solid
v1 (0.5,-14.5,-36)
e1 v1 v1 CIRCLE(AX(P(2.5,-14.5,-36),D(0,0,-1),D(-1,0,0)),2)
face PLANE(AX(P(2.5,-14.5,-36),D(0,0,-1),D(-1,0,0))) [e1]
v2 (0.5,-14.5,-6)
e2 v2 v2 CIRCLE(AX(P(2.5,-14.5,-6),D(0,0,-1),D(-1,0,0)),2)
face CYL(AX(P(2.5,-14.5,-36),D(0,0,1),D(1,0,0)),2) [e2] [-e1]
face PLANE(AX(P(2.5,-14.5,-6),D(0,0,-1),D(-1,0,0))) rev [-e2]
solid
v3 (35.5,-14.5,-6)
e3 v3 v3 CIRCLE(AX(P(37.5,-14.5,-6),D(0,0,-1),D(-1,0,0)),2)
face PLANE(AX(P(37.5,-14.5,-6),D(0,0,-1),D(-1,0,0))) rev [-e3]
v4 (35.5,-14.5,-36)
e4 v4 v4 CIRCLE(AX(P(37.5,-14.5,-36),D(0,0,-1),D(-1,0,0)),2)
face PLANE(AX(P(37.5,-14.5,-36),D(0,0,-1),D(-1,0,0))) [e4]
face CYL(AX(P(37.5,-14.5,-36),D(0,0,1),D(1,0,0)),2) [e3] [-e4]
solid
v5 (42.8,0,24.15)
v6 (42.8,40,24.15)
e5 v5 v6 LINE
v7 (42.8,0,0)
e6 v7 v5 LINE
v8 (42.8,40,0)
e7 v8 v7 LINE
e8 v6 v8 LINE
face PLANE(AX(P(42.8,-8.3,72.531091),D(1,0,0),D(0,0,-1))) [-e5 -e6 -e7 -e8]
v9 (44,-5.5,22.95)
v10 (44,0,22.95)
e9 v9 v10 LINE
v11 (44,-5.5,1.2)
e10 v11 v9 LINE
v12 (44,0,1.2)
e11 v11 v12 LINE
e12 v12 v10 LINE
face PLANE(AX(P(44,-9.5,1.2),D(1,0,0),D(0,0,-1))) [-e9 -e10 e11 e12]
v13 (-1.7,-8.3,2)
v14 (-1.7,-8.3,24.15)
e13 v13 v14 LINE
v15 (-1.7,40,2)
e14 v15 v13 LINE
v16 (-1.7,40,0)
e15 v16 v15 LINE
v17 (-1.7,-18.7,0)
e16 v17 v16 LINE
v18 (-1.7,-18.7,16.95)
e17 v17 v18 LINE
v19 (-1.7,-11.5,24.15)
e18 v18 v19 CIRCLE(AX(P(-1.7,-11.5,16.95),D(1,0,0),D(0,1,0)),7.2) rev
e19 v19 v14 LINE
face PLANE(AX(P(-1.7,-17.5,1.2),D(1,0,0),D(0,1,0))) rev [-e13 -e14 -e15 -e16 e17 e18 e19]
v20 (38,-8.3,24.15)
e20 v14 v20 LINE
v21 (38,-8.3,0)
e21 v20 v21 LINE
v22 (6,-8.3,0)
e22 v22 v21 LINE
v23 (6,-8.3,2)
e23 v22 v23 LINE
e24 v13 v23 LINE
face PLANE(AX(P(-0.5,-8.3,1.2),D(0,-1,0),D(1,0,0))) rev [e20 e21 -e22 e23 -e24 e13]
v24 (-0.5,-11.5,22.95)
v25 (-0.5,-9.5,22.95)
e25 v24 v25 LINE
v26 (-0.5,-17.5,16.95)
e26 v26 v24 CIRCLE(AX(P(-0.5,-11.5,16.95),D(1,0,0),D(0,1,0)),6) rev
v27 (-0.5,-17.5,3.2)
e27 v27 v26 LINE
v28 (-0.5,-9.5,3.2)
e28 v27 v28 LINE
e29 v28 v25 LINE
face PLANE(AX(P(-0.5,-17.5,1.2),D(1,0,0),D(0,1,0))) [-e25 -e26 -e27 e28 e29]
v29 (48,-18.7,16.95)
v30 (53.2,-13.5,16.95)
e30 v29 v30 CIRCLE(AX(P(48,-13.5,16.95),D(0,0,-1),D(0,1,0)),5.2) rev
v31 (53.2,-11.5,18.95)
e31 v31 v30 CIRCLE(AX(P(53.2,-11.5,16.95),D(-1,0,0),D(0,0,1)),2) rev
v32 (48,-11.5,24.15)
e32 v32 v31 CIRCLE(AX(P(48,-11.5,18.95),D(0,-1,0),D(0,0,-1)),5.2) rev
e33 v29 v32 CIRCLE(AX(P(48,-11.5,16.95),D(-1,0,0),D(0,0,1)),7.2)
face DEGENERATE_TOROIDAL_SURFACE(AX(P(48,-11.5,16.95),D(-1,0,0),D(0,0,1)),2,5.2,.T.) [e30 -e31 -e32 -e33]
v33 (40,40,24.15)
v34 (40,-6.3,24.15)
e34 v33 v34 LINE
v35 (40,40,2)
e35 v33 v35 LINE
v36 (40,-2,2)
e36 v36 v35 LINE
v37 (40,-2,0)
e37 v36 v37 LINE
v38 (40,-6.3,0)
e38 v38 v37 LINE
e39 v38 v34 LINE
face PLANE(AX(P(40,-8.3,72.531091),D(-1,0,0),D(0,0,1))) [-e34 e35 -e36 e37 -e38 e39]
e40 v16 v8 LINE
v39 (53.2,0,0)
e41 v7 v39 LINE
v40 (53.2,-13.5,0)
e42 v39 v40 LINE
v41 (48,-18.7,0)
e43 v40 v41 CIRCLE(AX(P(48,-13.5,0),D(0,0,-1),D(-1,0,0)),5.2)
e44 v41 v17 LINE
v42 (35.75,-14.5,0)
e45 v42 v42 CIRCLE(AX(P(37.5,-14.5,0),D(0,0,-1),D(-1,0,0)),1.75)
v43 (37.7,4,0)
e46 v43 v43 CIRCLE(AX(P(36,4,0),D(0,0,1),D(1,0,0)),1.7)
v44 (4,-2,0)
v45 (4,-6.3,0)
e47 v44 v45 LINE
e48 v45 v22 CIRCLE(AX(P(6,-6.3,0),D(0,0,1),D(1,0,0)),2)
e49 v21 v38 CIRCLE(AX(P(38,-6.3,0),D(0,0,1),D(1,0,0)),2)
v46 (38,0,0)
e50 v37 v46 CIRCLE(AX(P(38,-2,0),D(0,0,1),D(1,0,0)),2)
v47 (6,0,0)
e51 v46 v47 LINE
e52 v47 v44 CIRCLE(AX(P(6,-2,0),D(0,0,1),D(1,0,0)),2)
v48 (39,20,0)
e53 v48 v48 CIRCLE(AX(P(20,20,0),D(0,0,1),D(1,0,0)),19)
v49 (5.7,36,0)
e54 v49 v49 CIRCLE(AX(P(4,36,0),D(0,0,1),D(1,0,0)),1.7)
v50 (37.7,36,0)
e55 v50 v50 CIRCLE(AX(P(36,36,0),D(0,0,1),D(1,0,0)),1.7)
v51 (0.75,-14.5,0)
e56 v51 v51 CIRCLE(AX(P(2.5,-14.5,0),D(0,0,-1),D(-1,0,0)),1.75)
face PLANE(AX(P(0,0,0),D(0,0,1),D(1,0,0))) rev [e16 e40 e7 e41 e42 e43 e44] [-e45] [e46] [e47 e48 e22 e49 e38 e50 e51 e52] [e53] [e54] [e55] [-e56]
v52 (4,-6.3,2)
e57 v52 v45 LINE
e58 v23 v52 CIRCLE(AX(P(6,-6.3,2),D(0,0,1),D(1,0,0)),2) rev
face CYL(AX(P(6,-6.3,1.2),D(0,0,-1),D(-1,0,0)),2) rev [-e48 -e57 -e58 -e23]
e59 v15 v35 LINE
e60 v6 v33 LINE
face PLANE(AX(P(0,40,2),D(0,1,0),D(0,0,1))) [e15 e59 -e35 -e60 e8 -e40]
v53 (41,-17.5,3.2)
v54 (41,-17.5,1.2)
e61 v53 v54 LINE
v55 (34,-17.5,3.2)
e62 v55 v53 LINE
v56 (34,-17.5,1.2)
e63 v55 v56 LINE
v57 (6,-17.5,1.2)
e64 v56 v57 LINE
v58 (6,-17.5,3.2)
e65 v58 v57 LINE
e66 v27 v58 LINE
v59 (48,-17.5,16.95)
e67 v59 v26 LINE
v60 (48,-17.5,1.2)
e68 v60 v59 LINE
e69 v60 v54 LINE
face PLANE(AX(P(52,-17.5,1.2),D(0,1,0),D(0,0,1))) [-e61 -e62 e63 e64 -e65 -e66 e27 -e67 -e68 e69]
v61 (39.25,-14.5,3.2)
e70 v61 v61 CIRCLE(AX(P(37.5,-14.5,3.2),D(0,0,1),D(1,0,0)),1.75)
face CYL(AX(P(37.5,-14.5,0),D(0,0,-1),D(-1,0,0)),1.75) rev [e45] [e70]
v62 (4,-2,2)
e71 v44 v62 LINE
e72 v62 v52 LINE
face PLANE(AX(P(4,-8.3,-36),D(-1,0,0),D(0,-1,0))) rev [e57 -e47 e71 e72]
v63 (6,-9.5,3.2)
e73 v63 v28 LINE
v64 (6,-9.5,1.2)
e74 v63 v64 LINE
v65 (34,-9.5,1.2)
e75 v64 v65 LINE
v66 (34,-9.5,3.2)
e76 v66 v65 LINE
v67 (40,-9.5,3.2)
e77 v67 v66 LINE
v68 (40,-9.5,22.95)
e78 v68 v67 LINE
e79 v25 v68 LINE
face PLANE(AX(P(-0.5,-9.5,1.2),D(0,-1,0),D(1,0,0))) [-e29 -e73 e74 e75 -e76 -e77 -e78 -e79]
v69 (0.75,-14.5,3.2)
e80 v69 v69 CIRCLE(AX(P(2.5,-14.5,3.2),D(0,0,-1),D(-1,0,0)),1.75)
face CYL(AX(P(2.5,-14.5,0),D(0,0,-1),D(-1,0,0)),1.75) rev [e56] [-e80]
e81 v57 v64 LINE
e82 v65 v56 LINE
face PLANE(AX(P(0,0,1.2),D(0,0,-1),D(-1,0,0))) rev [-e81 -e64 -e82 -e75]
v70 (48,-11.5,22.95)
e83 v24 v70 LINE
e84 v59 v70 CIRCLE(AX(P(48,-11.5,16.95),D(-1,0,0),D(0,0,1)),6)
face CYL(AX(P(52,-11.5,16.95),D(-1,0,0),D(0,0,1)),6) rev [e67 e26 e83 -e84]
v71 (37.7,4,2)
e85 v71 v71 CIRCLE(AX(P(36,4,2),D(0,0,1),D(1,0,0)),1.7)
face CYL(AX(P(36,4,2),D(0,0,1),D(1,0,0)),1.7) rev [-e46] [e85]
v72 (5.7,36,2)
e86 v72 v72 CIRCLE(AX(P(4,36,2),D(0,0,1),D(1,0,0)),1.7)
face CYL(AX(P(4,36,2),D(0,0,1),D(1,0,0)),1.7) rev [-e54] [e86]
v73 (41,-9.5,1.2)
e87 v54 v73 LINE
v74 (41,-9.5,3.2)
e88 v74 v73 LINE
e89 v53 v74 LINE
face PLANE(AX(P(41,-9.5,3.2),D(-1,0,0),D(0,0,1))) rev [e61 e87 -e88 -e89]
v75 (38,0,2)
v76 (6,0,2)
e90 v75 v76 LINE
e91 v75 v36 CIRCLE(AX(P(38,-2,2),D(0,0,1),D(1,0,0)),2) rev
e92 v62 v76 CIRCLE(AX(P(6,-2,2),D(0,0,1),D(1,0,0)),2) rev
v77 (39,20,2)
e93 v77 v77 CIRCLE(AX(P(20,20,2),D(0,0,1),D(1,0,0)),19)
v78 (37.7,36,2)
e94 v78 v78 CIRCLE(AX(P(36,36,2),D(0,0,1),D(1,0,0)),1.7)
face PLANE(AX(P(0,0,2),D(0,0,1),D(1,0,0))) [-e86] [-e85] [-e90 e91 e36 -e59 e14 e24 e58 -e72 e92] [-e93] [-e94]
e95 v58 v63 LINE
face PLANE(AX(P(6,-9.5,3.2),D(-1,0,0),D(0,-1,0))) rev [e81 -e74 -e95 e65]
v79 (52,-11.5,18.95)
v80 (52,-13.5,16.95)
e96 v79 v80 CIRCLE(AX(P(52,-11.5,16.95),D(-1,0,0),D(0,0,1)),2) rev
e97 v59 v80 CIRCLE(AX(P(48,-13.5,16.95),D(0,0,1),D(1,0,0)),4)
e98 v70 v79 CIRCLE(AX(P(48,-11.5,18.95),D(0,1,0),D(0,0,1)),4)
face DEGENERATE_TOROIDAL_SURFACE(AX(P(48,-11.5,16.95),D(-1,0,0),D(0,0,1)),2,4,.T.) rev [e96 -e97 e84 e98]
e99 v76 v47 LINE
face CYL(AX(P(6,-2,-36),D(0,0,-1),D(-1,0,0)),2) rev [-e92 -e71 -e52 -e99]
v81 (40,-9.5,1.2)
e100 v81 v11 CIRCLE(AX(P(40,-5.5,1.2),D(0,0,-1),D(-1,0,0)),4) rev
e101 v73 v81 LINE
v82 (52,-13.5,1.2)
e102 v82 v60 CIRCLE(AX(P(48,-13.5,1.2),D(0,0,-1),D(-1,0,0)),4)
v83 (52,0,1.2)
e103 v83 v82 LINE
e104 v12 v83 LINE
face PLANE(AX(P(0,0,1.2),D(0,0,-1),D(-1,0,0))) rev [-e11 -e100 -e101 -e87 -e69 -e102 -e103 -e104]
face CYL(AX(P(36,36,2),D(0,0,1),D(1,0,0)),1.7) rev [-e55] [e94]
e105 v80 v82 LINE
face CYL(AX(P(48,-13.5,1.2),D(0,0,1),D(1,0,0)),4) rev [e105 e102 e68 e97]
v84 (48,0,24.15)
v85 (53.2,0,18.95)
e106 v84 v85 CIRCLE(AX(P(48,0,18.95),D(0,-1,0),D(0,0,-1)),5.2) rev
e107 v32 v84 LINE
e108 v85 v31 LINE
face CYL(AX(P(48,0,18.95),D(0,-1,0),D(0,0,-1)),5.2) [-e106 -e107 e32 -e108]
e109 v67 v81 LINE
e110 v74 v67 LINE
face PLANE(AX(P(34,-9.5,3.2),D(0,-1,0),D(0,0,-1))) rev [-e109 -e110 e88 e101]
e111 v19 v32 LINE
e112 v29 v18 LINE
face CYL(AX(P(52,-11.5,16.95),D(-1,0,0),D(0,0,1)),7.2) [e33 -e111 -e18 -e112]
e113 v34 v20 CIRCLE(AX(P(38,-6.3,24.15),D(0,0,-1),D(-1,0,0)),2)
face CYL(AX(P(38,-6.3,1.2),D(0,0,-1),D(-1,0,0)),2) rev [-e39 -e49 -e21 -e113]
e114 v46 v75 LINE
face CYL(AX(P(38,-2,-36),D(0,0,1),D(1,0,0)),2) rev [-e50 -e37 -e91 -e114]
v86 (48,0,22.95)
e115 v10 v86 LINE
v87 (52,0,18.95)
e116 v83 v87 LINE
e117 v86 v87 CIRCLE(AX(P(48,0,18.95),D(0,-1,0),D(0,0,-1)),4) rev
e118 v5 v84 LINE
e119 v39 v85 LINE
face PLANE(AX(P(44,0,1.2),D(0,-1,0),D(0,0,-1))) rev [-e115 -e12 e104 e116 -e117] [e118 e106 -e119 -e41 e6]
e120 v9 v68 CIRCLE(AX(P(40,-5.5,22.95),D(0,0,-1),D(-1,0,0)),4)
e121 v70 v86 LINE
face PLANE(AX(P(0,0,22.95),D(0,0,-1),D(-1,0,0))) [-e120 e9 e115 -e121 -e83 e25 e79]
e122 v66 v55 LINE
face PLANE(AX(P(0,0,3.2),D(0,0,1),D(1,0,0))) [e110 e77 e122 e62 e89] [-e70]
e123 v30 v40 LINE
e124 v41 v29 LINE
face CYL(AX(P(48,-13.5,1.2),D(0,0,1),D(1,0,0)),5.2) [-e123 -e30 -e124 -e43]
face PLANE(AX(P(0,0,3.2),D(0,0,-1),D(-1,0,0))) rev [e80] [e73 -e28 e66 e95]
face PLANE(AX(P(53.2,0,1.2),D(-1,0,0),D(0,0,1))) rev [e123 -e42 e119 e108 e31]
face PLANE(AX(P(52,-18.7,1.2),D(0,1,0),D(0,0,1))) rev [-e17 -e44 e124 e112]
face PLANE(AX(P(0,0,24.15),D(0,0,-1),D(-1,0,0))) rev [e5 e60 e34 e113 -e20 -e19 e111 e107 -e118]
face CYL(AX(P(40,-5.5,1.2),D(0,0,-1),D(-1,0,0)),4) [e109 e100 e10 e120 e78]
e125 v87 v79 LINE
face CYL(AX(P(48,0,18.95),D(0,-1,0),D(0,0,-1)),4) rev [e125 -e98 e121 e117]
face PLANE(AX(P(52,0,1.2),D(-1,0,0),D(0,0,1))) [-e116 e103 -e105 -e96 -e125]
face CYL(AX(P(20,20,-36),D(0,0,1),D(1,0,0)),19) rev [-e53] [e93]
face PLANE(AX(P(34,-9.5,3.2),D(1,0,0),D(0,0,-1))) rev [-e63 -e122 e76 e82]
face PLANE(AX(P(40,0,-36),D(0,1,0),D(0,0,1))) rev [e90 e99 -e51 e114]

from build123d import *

# Parameters (mm, degrees)
SKETCH1_W                           = 40
SKETCH1_H                           = 40
BOSS_EXTRUDE1_DEPTH                 = 2
M3_CLEARANCE_HOLE1_D                = 3.4
SKETCH10_W                          = 40
SKETCH10_H                          = 8.3
BOSS_EXTRUDE7_DEPTH                 = 2
BOSS_EXTRUDE10_START                = 6
SKETCH20_R                          = 2
BOSS_EXTRUDE10_DEPTH                = 30
BOSS_EXTRUDE10_2_DEPTH              = 30
BOSS_EXTRUDE11_DEPTH                = 21.75
FILLET4_R                           = 6
FILLET1_R                           = 4
SHELL1_T                            = 1.2
SKETCH25_W                          = 2.8
SKETCH25_H                          = 48.3
BOSS_EXTRUDE14_DEPTH                = 24.15
SKETCH26_W                          = 36
SKETCH26_H                          = 8.3
CUT_EXTRUDE5_DEPTH                  = 77.64359073
SKETCH27_R                          = 19
CUT_EXTRUDE6_DEPTH                  = 77.64359073
FILLET2_R                           = 2
FILLET3_R                           = 2
SKETCH29_W                          = 1.7
SKETCH29_H                          = 48.3
BOSS_EXTRUDE15_DEPTH                = 2
DELETEFACE1_OUTLINE_R               = 1.7
DELETEFACE1_DEPTH                   = 2
SKETCH32_W                          = 7
SKETCH32_H                          = 8
BOSS_EXTRUDE16_DEPTH                = 2
SKETCH31_W                          = 1.75
SKETCH31_H                          = 3.201
F_3_5_3_5_DIAMETER_HOLE1_AT_2_COUNT = 2
F_3_5_3_5_DIAMETER_HOLE1_AT_2_PITCH = 35


# Read off the part's stored shape, not the designer's step: DeleteFace1
with BuildPart() as part:
    # Sketch1 → Boss-Extrude1 (new body)
    with BuildSketch(Plane.XY):
        with Locations((20, 20)):
            Rectangle(SKETCH1_W, SKETCH1_H)
    extrude(amount=BOSS_EXTRUDE1_DEPTH)

    # M3 Clearance Hole1 (through all)
    with Locations(Plane.XY.offset(2)):
        with Locations((4, 36), (36, 4), (4, 4), (36, 36)):
            Hole(M3_CLEARANCE_HOLE1_D / 2)

    # Sketch10 → Boss-Extrude7 (add)
    with BuildSketch(Plane.XY.offset(2)):
        with Locations((20, -4.15)):
            Rectangle(SKETCH10_W, SKETCH10_H)
    extrude(amount=-BOSS_EXTRUDE7_DEPTH)



with BuildPart() as body_2:
    # Sketch20 → Boss-Extrude10 (new body)
    with BuildSketch(Plane(origin=(0, 0, 0), x_dir=(-1, 0, 0), z_dir=(0, 0, -1)).offset(BOSS_EXTRUDE10_START)):
        with Locations((-37.5, -14.5)):
            Circle(SKETCH20_R)
    extrude(amount=BOSS_EXTRUDE10_DEPTH)


with BuildPart() as body_3:
    # Sketch20 → Boss-Extrude10 2 (new body)
    with BuildSketch(Plane(origin=(0, 0, 0), x_dir=(-1, 0, 0), z_dir=(0, 0, -1)).offset(BOSS_EXTRUDE10_START)):
        with Locations((-2.5, -14.5)):
            Circle(SKETCH20_R)
    extrude(amount=BOSS_EXTRUDE10_2_DEPTH)


with BuildPart() as body_4:
    # Sketch22 → Boss-Extrude11 (new body)
    with BuildSketch(Plane(origin=(0, 0, 22.95), x_dir=(-1, 0, 0), z_dir=(0, 0, -1))):
        Polygon((-44, 0), (-52, 0), (-52, -17.5), (0.5, -17.5), (0.5, -9.5), (-44, -9.5), align=None)
    extrude(amount=BOSS_EXTRUDE11_DEPTH)

    # Fillet4
    fillet4_edges = [body_4.edges().sort_by_distance(p)[0] for p in [
        (25.75, -17.5, 22.95),
    ]]
    fillet(fillet4_edges, radius=FILLET4_R)

    # Fillet1
    fillet1_edges = [body_4.edges().sort_by_distance(p)[0] for p in [
        (44, -9.5, 12.075),
        (52, -17.5, 9.075),
        (52, -15.742640687, 21.192640687),
        (52, -5.75, 22.95),
    ]]
    fillet(fillet1_edges, radius=FILLET1_R)

    # Shell1
    shell1_openings = [body_4.faces().sort_by_distance(p)[0] for p in [
        (47.937463249, 0, 11.874064326),
    ]]
    offset(amount=SHELL1_T, openings=shell1_openings, kind=Kind.INTERSECTION)


with BuildPart() as part_1:
    add(part.part)

    add(body_4.part)  # Boss-Extrude14 merges body 4
    # Sketch25 → Boss-Extrude14 (add)
    with BuildSketch(Plane(origin=(0, 0, 0), x_dir=(-1, 0, 0), z_dir=(0, 0, -1))):
        with Locations((-41.4, 15.85)):
            Rectangle(SKETCH25_W, SKETCH25_H)
    extrude(amount=-BOSS_EXTRUDE14_DEPTH)

    # Sketch26 → Cut-Extrude5 (cut, through all)
    with BuildSketch(Plane.XY.offset(2)):
        with Locations((22, -4.15)):
            Rectangle(SKETCH26_W, SKETCH26_H)
    extrude(amount=-CUT_EXTRUDE5_DEPTH, mode=Mode.SUBTRACT)

    # Sketch27 → Cut-Extrude6 (cut, through all)
    with BuildSketch(Plane.XY.offset(2)):
        with Locations((20, 20)):
            Circle(SKETCH27_R)
    extrude(amount=-CUT_EXTRUDE6_DEPTH, mode=Mode.SUBTRACT)

    # Fillet2
    fillet2_edges = [part_1.edges().sort_by_distance(p)[0] for p in [
        (4, 0, 1),
        (40, 0, 1),
        (4, -8.3, 1),
    ]]
    fillet(fillet2_edges, radius=FILLET2_R)

    # Fillet3
    fillet3_edges = [part_1.edges().sort_by_distance(p)[0] for p in [
        (40, -8.3, 12.075),
    ]]
    fillet(fillet3_edges, radius=FILLET3_R)

    # Sketch29 → Boss-Extrude15 (add)
    with BuildSketch(Plane.XY.offset(2)):
        with Locations((-0.85, 15.85)):
            Rectangle(SKETCH29_W, SKETCH29_H)
    extrude(amount=-BOSS_EXTRUDE15_DEPTH)

    # DeleteFace1 outline → DeleteFace1 (add)
    with BuildSketch(Plane.XY):
        with Locations((4, 4)):
            Circle(DELETEFACE1_OUTLINE_R)
    extrude(amount=DELETEFACE1_DEPTH)

    # Sketch32 → Boss-Extrude16 (add)
    with BuildSketch(Plane.XY.offset(1.2)):
        with Locations((2.5, -13.5)):
            Rectangle(SKETCH32_W, SKETCH32_H)
        with Locations((37.5, -13.5)):
            Rectangle(SKETCH32_W, SKETCH32_H)
    extrude(amount=BOSS_EXTRUDE16_DEPTH)

    # Sketch31 → Ø3.5 (3.5) Diameter Hole1 (revolve, cut)
    with BuildSketch(Plane(origin=(37.5, -14.5, 0), x_dir=(0, 1, 0), z_dir=(1, 0, 0))):
        with Locations((0.875, 1.6005)):
            Rectangle(SKETCH31_W, SKETCH31_H)
    f_3_5_3_5_diameter_hole1 = revolve(axis=Axis((37.5, -14.5, -6.35), (0, 0, 1)), mode=Mode.SUBTRACT)

    # Ø3.5 (3.5) Diameter Hole1 at 2: Ø3.5 (3.5) Diameter Hole1 ×2
    with Locations(*[(-i * F_3_5_3_5_DIAMETER_HOLE1_AT_2_PITCH, 0, 0) for i in range(1, F_3_5_3_5_DIAMETER_HOLE1_AT_2_COUNT)]):
        add(f_3_5_3_5_diameter_hole1, mode=Mode.SUBTRACT)


solid = Compound([body_2.part, body_3.part, part_1.part])
